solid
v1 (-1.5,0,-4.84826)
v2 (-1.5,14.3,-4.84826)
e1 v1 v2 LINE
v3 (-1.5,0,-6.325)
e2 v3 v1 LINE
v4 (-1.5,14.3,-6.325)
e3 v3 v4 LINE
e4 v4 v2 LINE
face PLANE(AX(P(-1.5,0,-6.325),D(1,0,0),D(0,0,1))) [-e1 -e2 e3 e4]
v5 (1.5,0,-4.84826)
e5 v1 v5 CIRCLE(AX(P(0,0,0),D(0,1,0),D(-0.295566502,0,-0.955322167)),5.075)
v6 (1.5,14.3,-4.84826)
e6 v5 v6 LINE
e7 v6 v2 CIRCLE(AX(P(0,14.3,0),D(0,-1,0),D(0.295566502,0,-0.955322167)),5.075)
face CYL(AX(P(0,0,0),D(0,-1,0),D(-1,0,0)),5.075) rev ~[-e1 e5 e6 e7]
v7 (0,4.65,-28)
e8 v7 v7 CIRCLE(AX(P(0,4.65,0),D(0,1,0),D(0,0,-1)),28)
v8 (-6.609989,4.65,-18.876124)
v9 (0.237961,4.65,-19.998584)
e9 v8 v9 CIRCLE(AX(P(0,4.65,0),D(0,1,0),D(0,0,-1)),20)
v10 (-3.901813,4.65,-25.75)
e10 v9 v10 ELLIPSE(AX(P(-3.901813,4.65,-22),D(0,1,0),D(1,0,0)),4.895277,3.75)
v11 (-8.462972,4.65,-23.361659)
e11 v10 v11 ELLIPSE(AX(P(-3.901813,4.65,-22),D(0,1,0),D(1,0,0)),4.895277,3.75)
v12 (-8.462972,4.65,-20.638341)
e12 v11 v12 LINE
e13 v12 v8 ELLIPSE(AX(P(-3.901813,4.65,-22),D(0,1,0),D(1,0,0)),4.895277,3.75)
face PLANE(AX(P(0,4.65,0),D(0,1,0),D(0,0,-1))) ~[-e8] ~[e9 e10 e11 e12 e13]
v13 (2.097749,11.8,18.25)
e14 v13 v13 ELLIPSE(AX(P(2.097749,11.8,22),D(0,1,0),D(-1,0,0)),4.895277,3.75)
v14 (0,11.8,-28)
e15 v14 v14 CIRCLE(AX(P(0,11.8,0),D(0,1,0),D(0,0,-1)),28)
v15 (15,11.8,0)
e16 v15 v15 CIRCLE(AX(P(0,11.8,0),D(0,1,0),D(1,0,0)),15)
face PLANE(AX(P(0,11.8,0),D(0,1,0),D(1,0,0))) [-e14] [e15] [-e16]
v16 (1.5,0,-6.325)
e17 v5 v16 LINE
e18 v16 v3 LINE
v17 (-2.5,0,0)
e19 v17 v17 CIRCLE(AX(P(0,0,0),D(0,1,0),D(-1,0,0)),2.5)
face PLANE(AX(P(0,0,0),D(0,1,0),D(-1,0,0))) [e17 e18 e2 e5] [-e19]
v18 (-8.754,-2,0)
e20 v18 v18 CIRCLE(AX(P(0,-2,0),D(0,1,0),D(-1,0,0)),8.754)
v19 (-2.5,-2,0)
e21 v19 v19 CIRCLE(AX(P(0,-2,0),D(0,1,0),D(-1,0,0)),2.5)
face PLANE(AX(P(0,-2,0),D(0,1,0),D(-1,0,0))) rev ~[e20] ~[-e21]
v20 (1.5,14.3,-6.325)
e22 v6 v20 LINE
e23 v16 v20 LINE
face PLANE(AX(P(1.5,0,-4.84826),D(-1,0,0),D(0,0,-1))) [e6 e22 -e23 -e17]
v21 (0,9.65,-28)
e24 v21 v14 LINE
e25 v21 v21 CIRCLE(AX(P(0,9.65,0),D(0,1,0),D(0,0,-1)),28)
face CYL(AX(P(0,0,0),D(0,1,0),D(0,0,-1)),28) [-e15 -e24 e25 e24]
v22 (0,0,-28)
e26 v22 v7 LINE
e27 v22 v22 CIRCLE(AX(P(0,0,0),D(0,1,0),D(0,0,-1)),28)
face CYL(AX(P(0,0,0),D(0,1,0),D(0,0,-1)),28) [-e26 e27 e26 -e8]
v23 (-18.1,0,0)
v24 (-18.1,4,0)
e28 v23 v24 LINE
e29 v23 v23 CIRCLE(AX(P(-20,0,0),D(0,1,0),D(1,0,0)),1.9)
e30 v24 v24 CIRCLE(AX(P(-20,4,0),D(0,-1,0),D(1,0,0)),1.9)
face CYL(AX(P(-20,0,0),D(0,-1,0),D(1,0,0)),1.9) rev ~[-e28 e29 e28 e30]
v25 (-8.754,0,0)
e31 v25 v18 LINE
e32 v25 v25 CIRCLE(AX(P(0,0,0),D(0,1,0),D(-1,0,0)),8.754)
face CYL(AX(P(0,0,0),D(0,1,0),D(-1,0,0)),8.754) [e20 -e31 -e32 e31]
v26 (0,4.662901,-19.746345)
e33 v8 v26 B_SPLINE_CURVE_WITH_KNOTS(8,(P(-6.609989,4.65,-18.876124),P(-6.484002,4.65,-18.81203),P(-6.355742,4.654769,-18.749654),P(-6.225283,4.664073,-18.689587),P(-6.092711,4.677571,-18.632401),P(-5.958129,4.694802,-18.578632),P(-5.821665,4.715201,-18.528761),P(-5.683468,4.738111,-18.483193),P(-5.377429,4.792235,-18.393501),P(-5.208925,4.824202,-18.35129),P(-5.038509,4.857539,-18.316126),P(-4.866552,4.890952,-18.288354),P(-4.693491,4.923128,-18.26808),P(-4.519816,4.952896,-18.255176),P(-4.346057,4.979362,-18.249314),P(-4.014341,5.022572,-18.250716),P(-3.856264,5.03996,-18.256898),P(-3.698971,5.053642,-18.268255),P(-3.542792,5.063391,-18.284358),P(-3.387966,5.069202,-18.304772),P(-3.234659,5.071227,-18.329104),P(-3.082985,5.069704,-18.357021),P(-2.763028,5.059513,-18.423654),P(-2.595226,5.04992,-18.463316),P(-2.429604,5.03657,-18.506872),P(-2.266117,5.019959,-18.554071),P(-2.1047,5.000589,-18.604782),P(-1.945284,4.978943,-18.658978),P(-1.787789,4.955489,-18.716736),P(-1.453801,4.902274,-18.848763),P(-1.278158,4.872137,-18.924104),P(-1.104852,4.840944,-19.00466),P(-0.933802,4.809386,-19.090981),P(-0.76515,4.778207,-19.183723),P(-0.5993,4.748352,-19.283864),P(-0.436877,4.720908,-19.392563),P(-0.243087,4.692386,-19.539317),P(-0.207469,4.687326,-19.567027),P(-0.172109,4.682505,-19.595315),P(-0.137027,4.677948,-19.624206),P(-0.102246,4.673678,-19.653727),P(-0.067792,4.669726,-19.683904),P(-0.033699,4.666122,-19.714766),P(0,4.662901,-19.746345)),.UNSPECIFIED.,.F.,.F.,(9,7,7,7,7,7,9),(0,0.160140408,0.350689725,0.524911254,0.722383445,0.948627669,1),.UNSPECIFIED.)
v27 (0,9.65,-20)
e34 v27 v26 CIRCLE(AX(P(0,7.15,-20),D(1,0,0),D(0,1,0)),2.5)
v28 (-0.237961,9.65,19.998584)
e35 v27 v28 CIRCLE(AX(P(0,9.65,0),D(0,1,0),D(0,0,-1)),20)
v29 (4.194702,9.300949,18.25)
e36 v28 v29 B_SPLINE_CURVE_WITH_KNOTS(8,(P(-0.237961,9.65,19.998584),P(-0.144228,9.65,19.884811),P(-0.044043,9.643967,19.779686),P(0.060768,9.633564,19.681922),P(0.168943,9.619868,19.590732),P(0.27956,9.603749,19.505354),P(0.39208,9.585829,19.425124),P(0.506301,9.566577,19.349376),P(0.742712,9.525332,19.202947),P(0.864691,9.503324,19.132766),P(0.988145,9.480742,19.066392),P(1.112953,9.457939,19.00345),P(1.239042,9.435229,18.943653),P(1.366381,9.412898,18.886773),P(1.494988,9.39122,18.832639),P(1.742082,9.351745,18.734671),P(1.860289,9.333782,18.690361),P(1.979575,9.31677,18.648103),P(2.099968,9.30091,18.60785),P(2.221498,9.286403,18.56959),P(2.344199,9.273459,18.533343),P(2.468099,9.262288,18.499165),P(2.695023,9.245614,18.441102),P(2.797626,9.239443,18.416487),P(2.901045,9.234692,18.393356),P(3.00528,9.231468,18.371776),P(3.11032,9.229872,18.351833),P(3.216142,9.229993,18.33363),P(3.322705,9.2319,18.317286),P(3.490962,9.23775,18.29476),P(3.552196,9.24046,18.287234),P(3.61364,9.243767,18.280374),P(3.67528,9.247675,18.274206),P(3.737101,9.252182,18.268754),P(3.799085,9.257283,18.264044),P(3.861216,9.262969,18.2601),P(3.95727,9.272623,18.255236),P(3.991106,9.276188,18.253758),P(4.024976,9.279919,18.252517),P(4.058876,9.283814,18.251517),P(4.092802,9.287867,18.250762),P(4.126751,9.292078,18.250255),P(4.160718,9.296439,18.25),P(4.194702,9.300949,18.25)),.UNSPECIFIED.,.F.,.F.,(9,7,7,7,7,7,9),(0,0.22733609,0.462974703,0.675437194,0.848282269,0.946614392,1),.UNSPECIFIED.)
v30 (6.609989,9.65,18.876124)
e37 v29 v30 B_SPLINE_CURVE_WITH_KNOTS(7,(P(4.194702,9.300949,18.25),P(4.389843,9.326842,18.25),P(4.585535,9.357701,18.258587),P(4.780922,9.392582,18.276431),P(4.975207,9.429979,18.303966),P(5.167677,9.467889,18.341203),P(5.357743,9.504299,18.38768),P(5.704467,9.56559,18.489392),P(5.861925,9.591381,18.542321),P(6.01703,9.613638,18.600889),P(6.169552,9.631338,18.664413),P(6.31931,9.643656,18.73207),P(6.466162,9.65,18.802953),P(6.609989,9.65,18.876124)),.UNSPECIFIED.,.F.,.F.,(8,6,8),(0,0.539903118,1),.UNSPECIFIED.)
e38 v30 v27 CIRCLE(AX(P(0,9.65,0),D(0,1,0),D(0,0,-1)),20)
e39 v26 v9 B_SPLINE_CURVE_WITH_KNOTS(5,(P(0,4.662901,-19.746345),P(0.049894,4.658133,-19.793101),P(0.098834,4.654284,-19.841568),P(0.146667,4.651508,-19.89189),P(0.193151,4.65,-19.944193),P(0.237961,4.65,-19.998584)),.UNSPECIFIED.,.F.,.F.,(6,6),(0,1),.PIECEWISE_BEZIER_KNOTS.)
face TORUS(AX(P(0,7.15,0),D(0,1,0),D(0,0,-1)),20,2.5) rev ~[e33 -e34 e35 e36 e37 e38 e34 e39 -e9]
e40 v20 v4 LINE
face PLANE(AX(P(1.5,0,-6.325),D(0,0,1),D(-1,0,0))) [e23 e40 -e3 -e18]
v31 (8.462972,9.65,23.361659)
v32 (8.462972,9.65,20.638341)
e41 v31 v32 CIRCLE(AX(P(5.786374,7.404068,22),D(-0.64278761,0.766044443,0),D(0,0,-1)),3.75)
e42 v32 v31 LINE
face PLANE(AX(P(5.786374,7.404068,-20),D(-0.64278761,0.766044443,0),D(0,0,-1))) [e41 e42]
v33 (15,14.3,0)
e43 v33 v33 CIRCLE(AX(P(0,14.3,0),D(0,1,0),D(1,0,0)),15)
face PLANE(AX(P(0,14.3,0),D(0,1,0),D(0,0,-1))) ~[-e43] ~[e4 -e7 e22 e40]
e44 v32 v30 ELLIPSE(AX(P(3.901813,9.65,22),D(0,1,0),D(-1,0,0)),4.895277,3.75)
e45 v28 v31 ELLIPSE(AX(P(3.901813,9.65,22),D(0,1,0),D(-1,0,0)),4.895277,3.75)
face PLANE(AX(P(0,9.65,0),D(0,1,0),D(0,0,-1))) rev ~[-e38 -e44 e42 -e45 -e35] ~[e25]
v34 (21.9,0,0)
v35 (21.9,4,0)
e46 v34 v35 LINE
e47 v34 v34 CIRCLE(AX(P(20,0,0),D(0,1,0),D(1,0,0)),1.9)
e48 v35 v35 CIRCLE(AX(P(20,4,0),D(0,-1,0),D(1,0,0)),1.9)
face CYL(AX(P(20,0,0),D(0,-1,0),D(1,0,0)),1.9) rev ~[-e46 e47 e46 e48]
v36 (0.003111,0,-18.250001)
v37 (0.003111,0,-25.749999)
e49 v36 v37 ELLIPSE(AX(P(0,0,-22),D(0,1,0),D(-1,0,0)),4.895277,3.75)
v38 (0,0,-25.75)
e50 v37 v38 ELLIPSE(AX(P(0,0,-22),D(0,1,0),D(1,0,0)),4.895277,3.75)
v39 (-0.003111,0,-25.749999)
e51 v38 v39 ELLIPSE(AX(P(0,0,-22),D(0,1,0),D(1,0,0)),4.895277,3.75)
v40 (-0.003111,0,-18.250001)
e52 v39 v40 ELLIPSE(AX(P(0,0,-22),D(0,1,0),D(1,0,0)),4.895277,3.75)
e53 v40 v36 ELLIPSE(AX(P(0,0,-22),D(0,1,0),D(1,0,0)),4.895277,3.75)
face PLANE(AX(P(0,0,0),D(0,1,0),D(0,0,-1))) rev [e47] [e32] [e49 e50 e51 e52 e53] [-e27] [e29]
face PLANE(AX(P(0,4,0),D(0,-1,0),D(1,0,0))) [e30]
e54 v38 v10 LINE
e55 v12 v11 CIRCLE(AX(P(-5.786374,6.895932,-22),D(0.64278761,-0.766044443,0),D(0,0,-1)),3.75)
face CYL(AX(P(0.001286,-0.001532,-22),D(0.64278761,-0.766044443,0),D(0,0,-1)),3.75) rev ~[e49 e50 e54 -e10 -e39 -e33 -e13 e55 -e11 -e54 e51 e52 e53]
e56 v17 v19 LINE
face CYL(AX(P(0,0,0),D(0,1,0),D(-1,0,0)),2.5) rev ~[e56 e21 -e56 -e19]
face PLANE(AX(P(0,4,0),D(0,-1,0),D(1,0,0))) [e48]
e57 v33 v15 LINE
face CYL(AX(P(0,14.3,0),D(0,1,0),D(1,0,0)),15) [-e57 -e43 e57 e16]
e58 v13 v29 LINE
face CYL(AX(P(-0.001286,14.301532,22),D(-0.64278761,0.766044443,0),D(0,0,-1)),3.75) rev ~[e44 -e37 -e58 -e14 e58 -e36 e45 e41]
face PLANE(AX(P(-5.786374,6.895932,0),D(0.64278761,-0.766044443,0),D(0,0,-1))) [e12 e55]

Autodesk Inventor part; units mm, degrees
ref_plane "YZ Plane" through (0, 0, 0) normal (1, 0, 0) x (0, 1, 0)
sketch "Sketch1" plane through (0, 0, 0) normal (0, 1, 0) x (-1, 0, 0)
  circle A0 centre (0, 0) radius 5.075
  circle A1 centre (0, 0) radius 20
  line L0 (1.5, -3.825) -> (-1.5, -3.825)
  line L1 (-1.5, -3.825) -> (-1.5, -6.325)
  line L2 (-1.5, -6.325) -> (1.5, -6.325)
  line L3 (1.5, -6.325) -> (1.5, -3.825)
  line L4 (1.5, -3.825) -> (-1.5, -6.325) construction
  line L5 (-1.5, -3.825) -> (1.5, -6.325) construction
  circle A2 centre (0, 0) radius 2.5
  circle A3 centre (0, 0) radius 8.754
  point P0 (0, -5.075)
  point P1 (-1.5, -4.8483)
  point P2 (1.5, -4.8483)
  dimension "d0" = 10.15
  dimension "d1" = 40
  dimension "d2" = 1.25
  dimension "d3" = 3
  dimension "d17" = 5
extrude "Extrusion1" add sketch "Sketch1" along normal blind 14.3 contours A1 | A3
sketch "Sketch2" plane through (0, 0, 0) normal (1, 0, 0) x (0, 1, 0)
  line L0 (0, 0) -> (14.3, 0)
  line L1 (14.3, 0) -> (14.3, -20)
  line L2 (14.3, -20) -> (0, -20) construction
  line L3 (0, -20) -> (0, 0)
  line L4 (0, -20) -> (14.3, -20) construction
  line L5 (14.3, -20) -> (14.3, -20.0661)
  line L6 (0, -20) -> (14.3, -20) projected
  circle A0 centre (7.15, -20) radius 2.5
  line L7 (9.65, -20) -> (4.65, -20)
  line L8 (4.65, -20) -> (4.65, -28)
  line L9 (4.65, -28) -> (9.65, -28)
  line L10 (9.65, -28) -> (9.65, -20)
  line L11 (14.3, -20) -> (0, -20)
  line L12 (0, -20) -> (0, -28)
  line L13 (0, -28) -> (14.3, -28)
  line L14 (14.3, -28) -> (14.3, -20)
  point P0 (14.3, -20)
  point P1 (14.3, -20)
  dimension "d22" = 5
  dimension "d7" = 20
  dimension "d10" = 14.3
  dimension "d23" = 8
  dimension "d31" = 8
  dimension "d41" = 14.3
  dimension "d42" = 5
revolve "Revolution1" add sketch "Sketch2" angle 360 about axis through (0, 0, 0) along (0, 1, 0) contours L6 L8 L13 L12 | L5 L14 L13 L10 L6
extrude "Extrusion3" add sketch "Sketch1" against normal blind 2 contours A0 L3 L0 L1 | L1 L0 L3 A0 | A0 L3 L2 L1 | A3
revolve "Revolution4" cut sketch "Sketch2" angle 360 about axis through (0, 0, 0) along (0, 1, 0) picked at (7.2504, -19.1727) contours A0 L6
sketch "Sketch3" plane through (0, 0, 0) normal (0, -1, 0) x (1, 0, 0)
  line L0 (0, 0) -> (0, -22)
  dimension "d25" = 22
ref_plane "Work Plane1" through (0, 0, 0) normal (0.6427876, -0.7660444, 0) x (0, 0, -1)
sketch "Sketch4" plane through (0, 0, 0) normal (0.6427876, -0.7660444, 0) x (0, 0, -1)
  ellipse E0 centre (0, 2.7318) end of major axis (22, 2.7318) minor radius 16.853 projected
  line L0 (0, 0) -> (22, 0)
  circle A0 centre (22, 0) radius 3.75
  dimension "d27" = 22
  dimension "d28" = 7.5
extrude "Extrusion4" cut sketch "Sketch4" against normal blind 9 contours E0 L0 A0 | E0 A0 | E0 A0 L0 picked at (24.3646, -0.3075)
extrude "Extrusion5" cut sketch "Sketch4" along normal blind 7 contours E0 L0 A0 | E0 A0 | E0 A0 L0 picked at (24.3646, -0.3075)
ref_plane "Work Plane2" through (0, 14.3, -20) normal (-0.6427876, 0.7660444, 0) x (0, 0, -1)
sketch "Sketch5" plane through (0, 14.3, -20) normal (-0.6427876, 0.7660444, 0) x (0, 0, -1)
  ellipse E0 centre (-20, 0) end of major axis (-25.075, 0) minor radius 3.8877 (-15.1517, 1.1491) -> (-15.1517, -1.1491) ccw projected
  line L0 (-20, 0) -> (-42, 0)
  circle A0 centre (-42, 0) radius 3.75
  point P0 (-20, 9.1919)
  dimension "d35" = 22
  dimension "d36" = 7.5
extrude "Extrusion6" cut sketch "Sketch5" against normal blind 9
extrude "Extrusion7" cut sketch "Sketch5" along normal blind 8
extrude "Extrusion8" cut sketch "Sketch1" along normal through all contours A0 L3 L0 L1 | L1 L0 L3 A0 | A0 L3 L2 L1
sketch "Sketch6" plane through (0, 14.3, 0) normal (0, 1, 0) x (1, 0, 0)
  circle A0 centre (0, 0) radius 15
  circle A1 centre (0, 0) radius 35.6972
  dimension "d45" = 30
extrude "Extrusion9" cut sketch "Sketch6" against normal blind 2.5
sketch "Sketch7" plane through (0, 0, 0) normal (0, -1, 0) x (1, 0, 0)
  circle A0 centre (0, 0) radius 2.5 projected
  circle A1 centre (0, 0) radius 20
  line L0 (24, -7.5) -> (-24, -7.5)
  line L1 (-24, -7.5) -> (-24, 7.5)
  line L2 (-24, 7.5) -> (24, 7.5)
  line L3 (24, 7.5) -> (24, -7.5)
  line L4 (24, -7.5) -> (-24, 7.5) construction
  line L5 (-24, -7.5) -> (24, 7.5) construction
  circle A2 centre (0, 0) radius 11
  circle A3 centre (20, 0) radius 1.9
  circle A4 centre (-20, 0) radius 1.9
  dimension "d48" = 40
  dimension "d49" = 48
  dimension "d50" = 15
  dimension "d51" = 22
  dimension "d52" = 3.8
  dimension "d53" = 3.8
extrude "Extrusion10" cut sketch "Sketch7" against normal blind 4 contours A1 A3 | A1 A3 | A4 A1 | A1 A4
properties part number "spool_temp"
